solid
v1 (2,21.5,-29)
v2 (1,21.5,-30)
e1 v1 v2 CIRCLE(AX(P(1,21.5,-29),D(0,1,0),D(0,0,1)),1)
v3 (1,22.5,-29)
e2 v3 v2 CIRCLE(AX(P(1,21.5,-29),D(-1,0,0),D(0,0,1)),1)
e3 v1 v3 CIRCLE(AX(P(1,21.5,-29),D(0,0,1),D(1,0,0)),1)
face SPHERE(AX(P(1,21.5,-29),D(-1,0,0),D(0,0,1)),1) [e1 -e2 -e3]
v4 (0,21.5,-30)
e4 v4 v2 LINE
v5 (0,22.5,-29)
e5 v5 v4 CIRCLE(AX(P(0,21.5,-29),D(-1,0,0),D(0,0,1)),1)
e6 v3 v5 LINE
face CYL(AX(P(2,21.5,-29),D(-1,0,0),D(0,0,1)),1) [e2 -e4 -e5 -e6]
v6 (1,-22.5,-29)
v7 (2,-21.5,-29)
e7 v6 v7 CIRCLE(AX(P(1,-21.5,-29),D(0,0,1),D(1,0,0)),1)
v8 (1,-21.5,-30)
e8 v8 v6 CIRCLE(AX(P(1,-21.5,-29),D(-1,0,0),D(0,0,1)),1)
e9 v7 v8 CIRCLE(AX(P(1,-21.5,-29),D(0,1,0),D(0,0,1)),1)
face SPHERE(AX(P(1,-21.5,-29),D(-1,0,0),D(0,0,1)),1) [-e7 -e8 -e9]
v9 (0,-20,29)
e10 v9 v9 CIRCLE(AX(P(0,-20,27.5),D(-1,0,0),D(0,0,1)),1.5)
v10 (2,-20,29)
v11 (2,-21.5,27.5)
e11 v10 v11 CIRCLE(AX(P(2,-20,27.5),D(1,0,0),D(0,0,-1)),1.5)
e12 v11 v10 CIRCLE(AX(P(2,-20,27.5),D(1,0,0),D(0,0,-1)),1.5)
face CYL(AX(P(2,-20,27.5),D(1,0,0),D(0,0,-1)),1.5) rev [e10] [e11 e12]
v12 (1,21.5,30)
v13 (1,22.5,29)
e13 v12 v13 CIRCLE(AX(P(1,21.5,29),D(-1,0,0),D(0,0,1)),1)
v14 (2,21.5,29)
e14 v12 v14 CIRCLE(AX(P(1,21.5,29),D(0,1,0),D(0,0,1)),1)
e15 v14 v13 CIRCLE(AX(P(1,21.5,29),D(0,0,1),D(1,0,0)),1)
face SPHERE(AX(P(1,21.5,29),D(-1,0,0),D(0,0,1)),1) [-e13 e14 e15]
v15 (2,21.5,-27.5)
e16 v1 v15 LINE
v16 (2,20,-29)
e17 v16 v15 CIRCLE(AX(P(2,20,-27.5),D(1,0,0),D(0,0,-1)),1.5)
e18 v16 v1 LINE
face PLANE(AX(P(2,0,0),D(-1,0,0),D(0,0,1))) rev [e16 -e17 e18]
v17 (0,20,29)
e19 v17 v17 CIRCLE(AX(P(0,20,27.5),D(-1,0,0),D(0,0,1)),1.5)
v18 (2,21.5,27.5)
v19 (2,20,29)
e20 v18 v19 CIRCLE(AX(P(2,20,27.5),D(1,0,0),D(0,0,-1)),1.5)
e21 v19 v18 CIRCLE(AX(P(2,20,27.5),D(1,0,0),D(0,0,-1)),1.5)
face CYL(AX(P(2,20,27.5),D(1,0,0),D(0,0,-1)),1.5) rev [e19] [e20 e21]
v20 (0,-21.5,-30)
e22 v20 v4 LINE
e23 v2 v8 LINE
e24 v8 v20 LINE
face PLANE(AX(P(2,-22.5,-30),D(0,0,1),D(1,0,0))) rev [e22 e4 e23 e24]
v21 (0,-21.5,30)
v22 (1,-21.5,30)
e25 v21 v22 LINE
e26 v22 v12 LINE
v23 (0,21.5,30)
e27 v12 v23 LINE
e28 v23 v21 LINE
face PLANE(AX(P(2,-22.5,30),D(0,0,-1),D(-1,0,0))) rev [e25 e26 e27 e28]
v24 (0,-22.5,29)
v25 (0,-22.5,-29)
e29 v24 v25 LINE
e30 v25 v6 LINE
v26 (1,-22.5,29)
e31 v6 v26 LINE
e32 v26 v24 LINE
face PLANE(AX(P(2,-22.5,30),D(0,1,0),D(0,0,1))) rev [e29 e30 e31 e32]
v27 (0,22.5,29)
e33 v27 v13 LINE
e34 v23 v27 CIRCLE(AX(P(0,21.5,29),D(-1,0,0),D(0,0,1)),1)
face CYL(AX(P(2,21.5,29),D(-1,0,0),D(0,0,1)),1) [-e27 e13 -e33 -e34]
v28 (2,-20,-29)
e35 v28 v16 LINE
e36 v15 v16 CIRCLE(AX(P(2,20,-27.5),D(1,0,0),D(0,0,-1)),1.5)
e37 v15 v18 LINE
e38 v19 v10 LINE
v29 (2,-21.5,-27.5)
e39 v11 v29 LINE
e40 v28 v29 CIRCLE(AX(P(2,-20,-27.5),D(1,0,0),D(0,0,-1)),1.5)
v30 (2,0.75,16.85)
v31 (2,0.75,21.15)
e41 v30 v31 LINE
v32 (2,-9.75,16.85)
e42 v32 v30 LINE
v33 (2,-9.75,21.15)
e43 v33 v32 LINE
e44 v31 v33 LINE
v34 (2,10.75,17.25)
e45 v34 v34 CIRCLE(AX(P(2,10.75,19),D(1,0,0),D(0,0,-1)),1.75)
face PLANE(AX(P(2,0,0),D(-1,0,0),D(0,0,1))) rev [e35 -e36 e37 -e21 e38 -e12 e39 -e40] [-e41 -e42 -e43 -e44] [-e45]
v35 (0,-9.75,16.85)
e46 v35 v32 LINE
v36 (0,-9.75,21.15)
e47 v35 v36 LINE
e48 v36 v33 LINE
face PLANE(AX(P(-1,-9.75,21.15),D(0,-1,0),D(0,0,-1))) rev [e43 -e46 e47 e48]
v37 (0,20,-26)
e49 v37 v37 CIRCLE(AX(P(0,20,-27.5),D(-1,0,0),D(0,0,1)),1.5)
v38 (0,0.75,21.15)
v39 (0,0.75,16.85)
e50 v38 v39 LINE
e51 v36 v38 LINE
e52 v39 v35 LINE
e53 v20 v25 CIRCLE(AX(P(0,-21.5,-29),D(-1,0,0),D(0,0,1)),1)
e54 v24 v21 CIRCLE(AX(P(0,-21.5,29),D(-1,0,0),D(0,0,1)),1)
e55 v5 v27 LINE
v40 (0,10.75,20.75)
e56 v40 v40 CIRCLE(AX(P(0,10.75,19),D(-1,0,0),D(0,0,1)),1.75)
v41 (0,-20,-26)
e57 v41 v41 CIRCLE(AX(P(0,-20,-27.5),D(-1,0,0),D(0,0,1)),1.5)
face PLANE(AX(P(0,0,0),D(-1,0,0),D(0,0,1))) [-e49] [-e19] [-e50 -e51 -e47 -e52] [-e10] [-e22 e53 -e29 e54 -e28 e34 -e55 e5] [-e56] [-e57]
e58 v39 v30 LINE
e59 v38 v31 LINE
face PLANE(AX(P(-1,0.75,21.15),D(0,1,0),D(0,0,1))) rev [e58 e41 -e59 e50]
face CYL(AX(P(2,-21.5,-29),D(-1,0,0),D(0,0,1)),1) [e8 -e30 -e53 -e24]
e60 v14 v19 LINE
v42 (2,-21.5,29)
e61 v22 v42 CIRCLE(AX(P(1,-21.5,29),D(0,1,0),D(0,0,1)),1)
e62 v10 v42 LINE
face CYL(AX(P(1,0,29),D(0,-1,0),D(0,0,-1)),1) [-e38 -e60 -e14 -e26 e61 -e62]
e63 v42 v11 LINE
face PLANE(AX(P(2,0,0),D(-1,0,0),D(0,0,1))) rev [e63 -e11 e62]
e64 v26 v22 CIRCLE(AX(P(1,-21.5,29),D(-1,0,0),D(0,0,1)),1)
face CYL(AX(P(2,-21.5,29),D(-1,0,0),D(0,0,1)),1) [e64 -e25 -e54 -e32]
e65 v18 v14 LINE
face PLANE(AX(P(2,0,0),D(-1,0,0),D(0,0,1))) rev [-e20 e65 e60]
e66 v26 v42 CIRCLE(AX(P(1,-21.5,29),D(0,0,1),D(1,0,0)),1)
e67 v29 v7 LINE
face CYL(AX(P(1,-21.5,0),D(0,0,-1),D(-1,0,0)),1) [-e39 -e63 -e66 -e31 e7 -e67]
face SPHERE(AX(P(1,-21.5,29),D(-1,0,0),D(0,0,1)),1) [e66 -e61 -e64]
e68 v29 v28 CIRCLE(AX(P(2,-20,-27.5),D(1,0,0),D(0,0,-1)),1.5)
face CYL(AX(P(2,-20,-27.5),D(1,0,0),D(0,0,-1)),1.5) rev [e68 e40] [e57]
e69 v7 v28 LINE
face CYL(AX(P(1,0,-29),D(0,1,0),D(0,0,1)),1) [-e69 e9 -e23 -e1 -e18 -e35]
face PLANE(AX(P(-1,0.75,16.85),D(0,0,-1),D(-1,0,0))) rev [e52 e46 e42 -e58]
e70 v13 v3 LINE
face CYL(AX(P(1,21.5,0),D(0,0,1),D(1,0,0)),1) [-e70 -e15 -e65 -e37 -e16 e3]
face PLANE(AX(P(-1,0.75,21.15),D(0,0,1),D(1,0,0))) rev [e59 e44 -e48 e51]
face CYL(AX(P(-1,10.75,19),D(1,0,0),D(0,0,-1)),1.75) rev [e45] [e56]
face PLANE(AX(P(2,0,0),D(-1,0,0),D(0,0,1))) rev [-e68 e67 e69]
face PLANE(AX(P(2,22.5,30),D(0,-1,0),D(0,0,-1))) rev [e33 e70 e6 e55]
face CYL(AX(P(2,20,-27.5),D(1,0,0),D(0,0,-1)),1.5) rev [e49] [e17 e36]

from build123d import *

# Parameters (mm, degrees)
SKETCH1_W                 = 60
SKETCH1_H                 = 45
BOSS_EXTRUDE1_DEPTH       = 2
F_3_0MM_DOWEL_HOLE1_D     = 3
F_3_0MM_DOWEL_HOLE1_DEPTH = 20
F_3_0MM_DOWEL_HOLE1_TIP   = 0.901290929
FILLET2_R                 = 1
FILLET1_R                 = 1
SKETCH4_R                 = 1.75
SKETCH4_W                 = 4.3
SKETCH4_H                 = 10.5
CUT_EXTRUDE1_DEPTH        = 3


with BuildPart() as part:
    # Sketch1 → Boss-Extrude1 (new body)
    with BuildSketch(Plane(origin=(0, 0, 0), x_dir=(0, 0, -1), z_dir=(1, 0, 0))):
        Rectangle(SKETCH1_W, SKETCH1_H)
    extrude(amount=BOSS_EXTRUDE1_DEPTH)

    # Ø3.0mm Dowel Hole1
    with Locations(Plane(origin=(2, 0, 0), x_dir=(0, 0, -1), z_dir=(1, 0, 0))):
        with Locations((-27.5, 20), (27.5, 20), (27.5, -20), (-27.5, -20)):
            Hole(F_3_0MM_DOWEL_HOLE1_D / 2, depth=F_3_0MM_DOWEL_HOLE1_DEPTH)
            with Locations((0, 0, -(F_3_0MM_DOWEL_HOLE1_DEPTH + F_3_0MM_DOWEL_HOLE1_TIP / 2))):  # 118° drill point
                Cone(0, F_3_0MM_DOWEL_HOLE1_D / 2, F_3_0MM_DOWEL_HOLE1_TIP, mode=Mode.SUBTRACT)

    # Fillet2
    fillet2_edges = [part.edges().sort_by_distance(p)[0] for p in [
        (1, -22.5, -30),
        (1, -22.5, 30),
        (1, 22.5, 30),
        (1, 22.5, -30),
    ]]
    fillet(fillet2_edges, radius=FILLET2_R)

    # Fillet1
    fillet1_edges = [part.edges().sort_by_distance(p)[0] for p in [
        (2, 0, -30),
        (2, -22.5, 0),
        (2, 22.5, 0),
        (2, 0, 30),
        (2, 22.207106781, 29.707106781),
        (2, 22.207106781, -29.707106781),
        (2, -22.207106781, 29.707106781),
        (2, -22.207106781, -29.707106781),
    ]]
    fillet(fillet1_edges, radius=FILLET1_R - 0.0001)  # a hair under: the kernel refuses the full size

    # Sketch4 → Cut-Extrude1 (cut)
    with BuildSketch(Plane(origin=(2, 0, 0), x_dir=(0, 0, -1), z_dir=(1, 0, 0))):
        with Locations((-19, 10.75)):
            Circle(SKETCH4_R)
        with Locations((-19, -4.5)):
            Rectangle(SKETCH4_W, SKETCH4_H)
    extrude(amount=-CUT_EXTRUDE1_DEPTH, mode=Mode.SUBTRACT)


solid = part.part
